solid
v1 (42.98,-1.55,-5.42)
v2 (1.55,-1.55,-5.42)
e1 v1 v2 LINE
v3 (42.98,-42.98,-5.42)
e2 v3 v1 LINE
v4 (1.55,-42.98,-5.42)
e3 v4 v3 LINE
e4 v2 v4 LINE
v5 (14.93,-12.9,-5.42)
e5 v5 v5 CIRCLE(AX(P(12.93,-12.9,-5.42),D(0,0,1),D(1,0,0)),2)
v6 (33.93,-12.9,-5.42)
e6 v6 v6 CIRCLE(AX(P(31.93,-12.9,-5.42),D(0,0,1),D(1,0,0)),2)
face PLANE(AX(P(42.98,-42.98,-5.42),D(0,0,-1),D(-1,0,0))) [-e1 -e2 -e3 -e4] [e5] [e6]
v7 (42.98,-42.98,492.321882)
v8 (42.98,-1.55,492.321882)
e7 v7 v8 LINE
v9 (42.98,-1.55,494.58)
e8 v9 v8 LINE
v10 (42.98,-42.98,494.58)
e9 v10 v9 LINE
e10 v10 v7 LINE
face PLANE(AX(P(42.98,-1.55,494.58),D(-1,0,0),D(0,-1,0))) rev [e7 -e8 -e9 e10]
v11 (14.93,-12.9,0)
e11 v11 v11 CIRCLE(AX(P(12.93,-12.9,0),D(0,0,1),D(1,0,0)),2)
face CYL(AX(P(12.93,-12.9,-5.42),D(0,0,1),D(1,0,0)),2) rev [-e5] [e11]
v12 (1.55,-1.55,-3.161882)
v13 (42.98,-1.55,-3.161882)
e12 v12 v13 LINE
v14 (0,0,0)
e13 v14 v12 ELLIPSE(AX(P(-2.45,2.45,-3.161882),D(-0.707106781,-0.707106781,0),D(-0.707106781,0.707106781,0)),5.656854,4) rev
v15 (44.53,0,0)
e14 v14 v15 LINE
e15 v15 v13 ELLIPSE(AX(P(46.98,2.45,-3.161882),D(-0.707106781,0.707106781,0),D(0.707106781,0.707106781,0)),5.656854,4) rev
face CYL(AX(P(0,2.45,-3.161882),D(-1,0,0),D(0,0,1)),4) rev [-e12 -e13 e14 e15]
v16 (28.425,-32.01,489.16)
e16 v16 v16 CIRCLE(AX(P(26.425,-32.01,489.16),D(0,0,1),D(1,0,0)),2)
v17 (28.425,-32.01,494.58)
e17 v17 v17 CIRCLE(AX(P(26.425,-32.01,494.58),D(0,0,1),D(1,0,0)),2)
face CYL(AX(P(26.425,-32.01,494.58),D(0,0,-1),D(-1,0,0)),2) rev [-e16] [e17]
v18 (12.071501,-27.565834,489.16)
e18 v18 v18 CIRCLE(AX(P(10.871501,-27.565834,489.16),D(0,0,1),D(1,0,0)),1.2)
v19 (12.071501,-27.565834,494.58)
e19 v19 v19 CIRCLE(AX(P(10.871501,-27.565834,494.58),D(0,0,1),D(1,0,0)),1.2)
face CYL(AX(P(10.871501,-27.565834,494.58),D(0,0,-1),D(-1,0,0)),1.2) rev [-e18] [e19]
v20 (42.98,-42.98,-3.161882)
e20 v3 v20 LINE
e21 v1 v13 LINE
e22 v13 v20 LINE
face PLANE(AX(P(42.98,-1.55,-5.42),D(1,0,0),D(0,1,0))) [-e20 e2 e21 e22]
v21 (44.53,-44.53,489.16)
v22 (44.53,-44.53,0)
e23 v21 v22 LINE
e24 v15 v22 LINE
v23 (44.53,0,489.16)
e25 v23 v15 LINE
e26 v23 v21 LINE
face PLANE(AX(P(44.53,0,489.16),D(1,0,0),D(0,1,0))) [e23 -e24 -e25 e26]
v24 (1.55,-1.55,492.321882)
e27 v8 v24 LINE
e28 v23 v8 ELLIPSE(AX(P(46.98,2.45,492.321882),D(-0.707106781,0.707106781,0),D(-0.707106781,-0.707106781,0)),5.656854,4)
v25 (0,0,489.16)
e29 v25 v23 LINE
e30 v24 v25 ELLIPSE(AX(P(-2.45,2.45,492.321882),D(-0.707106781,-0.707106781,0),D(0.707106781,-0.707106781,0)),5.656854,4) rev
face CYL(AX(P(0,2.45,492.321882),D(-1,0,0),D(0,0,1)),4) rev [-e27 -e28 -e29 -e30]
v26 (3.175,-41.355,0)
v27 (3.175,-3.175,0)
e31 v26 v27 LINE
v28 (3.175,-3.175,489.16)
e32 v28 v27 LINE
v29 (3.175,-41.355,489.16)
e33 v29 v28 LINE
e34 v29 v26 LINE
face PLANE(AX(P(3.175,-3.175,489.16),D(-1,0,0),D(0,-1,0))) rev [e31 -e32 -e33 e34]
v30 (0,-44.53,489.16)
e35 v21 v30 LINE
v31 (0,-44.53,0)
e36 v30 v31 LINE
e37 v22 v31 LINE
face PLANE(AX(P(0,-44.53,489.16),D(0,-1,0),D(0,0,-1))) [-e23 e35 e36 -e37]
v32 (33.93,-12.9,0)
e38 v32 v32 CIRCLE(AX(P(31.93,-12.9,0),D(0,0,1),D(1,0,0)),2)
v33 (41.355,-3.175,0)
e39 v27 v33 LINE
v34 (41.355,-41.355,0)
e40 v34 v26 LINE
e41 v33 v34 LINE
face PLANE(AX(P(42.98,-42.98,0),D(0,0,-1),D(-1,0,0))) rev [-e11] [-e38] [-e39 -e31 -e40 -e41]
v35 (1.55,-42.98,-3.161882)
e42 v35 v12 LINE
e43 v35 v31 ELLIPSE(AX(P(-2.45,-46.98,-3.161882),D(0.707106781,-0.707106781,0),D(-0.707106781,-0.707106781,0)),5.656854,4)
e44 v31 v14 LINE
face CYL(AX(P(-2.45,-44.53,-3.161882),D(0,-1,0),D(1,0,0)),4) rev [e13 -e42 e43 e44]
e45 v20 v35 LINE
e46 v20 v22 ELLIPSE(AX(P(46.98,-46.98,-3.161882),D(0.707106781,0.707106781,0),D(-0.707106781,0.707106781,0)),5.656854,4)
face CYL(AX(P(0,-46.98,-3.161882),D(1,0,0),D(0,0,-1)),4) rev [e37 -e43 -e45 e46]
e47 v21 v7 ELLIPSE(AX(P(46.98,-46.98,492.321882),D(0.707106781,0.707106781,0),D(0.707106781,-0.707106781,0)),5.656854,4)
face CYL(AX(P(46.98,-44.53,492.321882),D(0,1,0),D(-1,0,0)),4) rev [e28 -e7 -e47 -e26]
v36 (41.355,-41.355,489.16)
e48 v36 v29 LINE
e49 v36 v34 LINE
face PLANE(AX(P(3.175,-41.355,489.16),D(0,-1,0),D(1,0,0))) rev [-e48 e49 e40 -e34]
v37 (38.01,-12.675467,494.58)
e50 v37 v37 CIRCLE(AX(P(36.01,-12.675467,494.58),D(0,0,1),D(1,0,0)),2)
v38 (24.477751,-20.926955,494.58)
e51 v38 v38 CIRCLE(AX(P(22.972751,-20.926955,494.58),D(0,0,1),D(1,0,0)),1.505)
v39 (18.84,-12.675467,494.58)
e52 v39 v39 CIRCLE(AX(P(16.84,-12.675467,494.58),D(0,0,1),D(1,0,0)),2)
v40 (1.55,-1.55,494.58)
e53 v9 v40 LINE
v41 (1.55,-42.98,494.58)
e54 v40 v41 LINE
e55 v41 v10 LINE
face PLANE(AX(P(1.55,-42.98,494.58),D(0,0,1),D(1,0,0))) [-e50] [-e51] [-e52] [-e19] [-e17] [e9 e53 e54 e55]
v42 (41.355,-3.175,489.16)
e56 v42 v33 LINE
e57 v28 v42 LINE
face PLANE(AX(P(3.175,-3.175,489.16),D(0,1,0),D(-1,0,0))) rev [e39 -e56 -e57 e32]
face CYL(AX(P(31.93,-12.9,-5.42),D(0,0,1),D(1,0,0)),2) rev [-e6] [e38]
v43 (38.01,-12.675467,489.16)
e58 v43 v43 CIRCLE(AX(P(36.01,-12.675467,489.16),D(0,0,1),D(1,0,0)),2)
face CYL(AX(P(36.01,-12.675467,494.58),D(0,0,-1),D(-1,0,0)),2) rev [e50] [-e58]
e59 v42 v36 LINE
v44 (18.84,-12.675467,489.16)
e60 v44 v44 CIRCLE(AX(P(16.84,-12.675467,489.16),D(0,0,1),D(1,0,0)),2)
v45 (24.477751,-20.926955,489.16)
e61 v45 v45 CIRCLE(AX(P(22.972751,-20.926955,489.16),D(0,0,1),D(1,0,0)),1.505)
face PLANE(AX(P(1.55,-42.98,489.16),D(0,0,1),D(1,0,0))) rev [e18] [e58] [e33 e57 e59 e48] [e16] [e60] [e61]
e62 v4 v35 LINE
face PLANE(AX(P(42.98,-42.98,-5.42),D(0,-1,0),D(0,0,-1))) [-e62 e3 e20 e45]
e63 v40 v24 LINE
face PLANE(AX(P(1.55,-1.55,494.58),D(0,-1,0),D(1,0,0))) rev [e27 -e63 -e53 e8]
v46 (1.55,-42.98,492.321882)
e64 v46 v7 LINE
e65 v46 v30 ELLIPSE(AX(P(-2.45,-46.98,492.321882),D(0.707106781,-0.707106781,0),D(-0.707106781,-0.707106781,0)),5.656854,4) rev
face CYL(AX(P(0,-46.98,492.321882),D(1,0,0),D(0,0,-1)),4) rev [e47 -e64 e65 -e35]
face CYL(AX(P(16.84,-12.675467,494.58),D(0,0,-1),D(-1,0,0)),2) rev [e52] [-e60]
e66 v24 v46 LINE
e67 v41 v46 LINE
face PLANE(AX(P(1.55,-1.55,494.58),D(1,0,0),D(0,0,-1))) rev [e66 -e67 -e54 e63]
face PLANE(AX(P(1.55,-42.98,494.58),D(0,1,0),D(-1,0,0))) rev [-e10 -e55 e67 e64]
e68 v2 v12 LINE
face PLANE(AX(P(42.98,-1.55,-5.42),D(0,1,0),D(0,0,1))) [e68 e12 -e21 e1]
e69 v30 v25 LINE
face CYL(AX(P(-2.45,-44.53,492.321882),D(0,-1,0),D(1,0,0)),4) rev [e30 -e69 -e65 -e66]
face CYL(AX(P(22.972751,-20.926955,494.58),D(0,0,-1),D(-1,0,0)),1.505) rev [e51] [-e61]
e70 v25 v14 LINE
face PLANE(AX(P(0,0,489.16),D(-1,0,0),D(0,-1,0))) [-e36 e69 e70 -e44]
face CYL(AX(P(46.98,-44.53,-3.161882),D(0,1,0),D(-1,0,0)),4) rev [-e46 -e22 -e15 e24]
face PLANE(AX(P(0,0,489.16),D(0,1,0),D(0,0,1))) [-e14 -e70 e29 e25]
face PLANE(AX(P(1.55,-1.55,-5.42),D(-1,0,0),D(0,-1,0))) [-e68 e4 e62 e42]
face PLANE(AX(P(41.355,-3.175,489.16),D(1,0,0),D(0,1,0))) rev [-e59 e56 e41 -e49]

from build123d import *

# Parameters (mm, degrees)
SKETCH1_W           = 41.43
SKETCH1_H           = 41.43
SKETCH1_R           = 2
BOSS_EXTRUDE1_DEPTH = 5.42
SKETCH2_W           = 44.53
SKETCH2_H           = 44.53
SKETCH2_W_2         = 38.18
SKETCH2_H_2         = 38.18
BOSS_EXTRUDE2_DEPTH = 489.16
SKETCH3_W           = 41.43
SKETCH3_H           = 41.43
SKETCH3_R           = 2
SKETCH3_R_2         = 1.505
SKETCH3_R_3         = 1.2
BOSS_EXTRUDE3_DEPTH = 5.42
FILLET1_R           = 4


with BuildPart() as part:
    # Sketch1 → Boss-Extrude1 (new body)
    with BuildSketch(Plane.XY):
        with Locations((22.265, -22.265)):
            Rectangle(SKETCH1_W, SKETCH1_H)
        with Locations((12.93, -12.9)):
            Circle(SKETCH1_R, mode=Mode.SUBTRACT)
        with Locations((31.93, -12.9)):
            Circle(SKETCH1_R, mode=Mode.SUBTRACT)
    extrude(amount=-BOSS_EXTRUDE1_DEPTH)

    # Sketch2 → Boss-Extrude2 (add)
    with BuildSketch(Plane(origin=(0, 0, 0), x_dir=(-1, 0, 0), z_dir=(0, 0, -1))):
        with Locations((-22.265, -22.265)):
            Rectangle(SKETCH2_W, SKETCH2_H)
        with Locations((-22.265, -22.265)):
            Rectangle(SKETCH2_W_2, SKETCH2_H_2, mode=Mode.SUBTRACT)
    extrude(amount=-BOSS_EXTRUDE2_DEPTH)

    # Sketch3 → Boss-Extrude3 (add)
    with BuildSketch(Plane.XY.offset(489.16)):
        with Locations((22.265, -22.265)):
            Rectangle(SKETCH3_W, SKETCH3_H)
        with Locations((16.84, -12.675466776)):
            Circle(SKETCH3_R, mode=Mode.SUBTRACT)
        with Locations((36.01, -12.675466776)):
            Circle(SKETCH3_R, mode=Mode.SUBTRACT)
        with Locations((26.425, -32.01)):
            Circle(SKETCH3_R, mode=Mode.SUBTRACT)
        with Locations((22.97275137, -20.926955012)):
            Circle(SKETCH3_R_2, mode=Mode.SUBTRACT)
        with Locations((10.8715013, -27.565833881)):
            Circle(SKETCH3_R_3, mode=Mode.SUBTRACT)
    extrude(amount=BOSS_EXTRUDE3_DEPTH)

    # Fillet1
    # the kernel refuses this fillet: 4 mm, written as the material it adds along each edge
    with BuildSketch(Plane(origin=(1.55, -42.98, 0), x_dir=(0, -1, 0), z_dir=(1, 0, 0)), Plane(origin=(1.55, -42.98, 489.16), x_dir=(-1, 0, 0), z_dir=(0, 1, 0)), Plane(origin=(42.98, -42.98, 489.16), x_dir=(0, -1, 0), z_dir=(-1, 0, 0)), Plane(origin=(42.98, -1.55, 489.16), x_dir=(1, 0, 0), z_dir=(0, -1, 0)), Plane(origin=(1.55, -1.55, 489.16), x_dir=(0, 1, 0), z_dir=(1, 0, 0))) as fillet1_piece_1:
        with BuildLine():
            CenterArc((4, 3.161882351), FILLET1_R, 180, 52.229510411)
            Line((0, 3.161882351), (-0.08, 3.161882351))
            Line((-0.08, 3.161882351), (-0.08, 0))
            Line((-0.08, 0), (0, -0.08))
            ThreePointArc((0, -0.08), (0.775, -0.08), (1.501, -0.063237647))
            Line((1.501, -0.063237647), (1.55, 0))
        make_face()
    extrude(amount=41.43)
    with BuildSketch(Plane(origin=(1.55, -1.55, 0), x_dir=(0, 0, -1), z_dir=(0, -1, 0)), Plane(origin=(42.98, -1.55, 0), x_dir=(0, 0, -1), z_dir=(-1, 0, 0)), Plane(origin=(42.98, -42.98, 0), x_dir=(0, 0, -1), z_dir=(0, 1, 0))) as fillet1_piece_2:
        with BuildLine():
            CenterArc((3.161882351, -4), FILLET1_R, 90, 52.229510411)
            Line((0, -1.55), (-0.063237647, -1.501))
            ThreePointArc((-0.063237647, -1.501), (-0.08, -0.775), (-0.08, 0))
            Line((-0.08, 0), (0, 0.08))
            Line((0, 0.08), (3.161882351, 0.08))
            Line((3.161882351, 0.08), (3.161882351, 0))
        make_face()
    extrude(amount=41.43)
    with BuildSketch(Plane(origin=(1.55, -1.55, 0), x_dir=(0, 0, -1), z_dir=(0, -1, 0))) as fillet1_piece_3a_section:
        with BuildLine():
            CenterArc((3.161882351, -4), FILLET1_R, 90, 52.229510411)
            Line((0, -1.55), (-0.063237647, -1.501))
            ThreePointArc((-0.063237647, -1.501), (-0.08, -0.775), (-0.08, 0))
            Line((-0.08, 0), (0, 0.08))
            Line((0, 0.08), (3.161882351, 0.08))
            Line((3.161882351, 0.08), (3.161882351, 0))
        make_face()
    fillet1_piece_3a = extrude(amount=49.334705877, mode=Mode.PRIVATE)
    fillet1_piece_3a = split(fillet1_piece_3a, bisect_by=Plane(origin=(1.154343324, -42.98, -0.817162135), z_dir=(0, -1, 0)), keep=Keep.TOP, mode=Mode.PRIVATE)
    fillet1_piece_3a = split(fillet1_piece_3a, bisect_by=Plane(origin=(1.154343324, -44.53, -0.817162135), z_dir=(0, 1, 0)), keep=Keep.TOP, mode=Mode.PRIVATE)
    with BuildSketch(Plane(origin=(-6.354705877, -42.98, 0), x_dir=(0, -1, 0), z_dir=(1, 0, 0))) as fillet1_piece_3b_section:
        with BuildLine():
            CenterArc((4, 3.161882351), FILLET1_R, 180, 52.229510411)
            Line((0, 3.161882351), (-0.08, 3.161882351))
            Line((-0.08, 3.161882351), (-0.08, 0))
            Line((-0.08, 0), (0, -0.08))
            ThreePointArc((0, -0.08), (0.775, -0.08), (1.501, -0.063237647))
            Line((1.501, -0.063237647), (1.55, 0))
        make_face()
    fillet1_piece_3b = extrude(amount=49.334705877, mode=Mode.PRIVATE)
    fillet1_piece_3b = split(fillet1_piece_3b, bisect_by=Plane(origin=(1.55, -43.375656676, -0.817162135), z_dir=(-1, 0, 0)), keep=Keep.TOP, mode=Mode.PRIVATE)
    fillet1_piece_3b = split(fillet1_piece_3b, bisect_by=Plane(origin=(0, -43.375656676, -0.817162135), z_dir=(1, 0, 0)), keep=Keep.TOP, mode=Mode.PRIVATE)
    fillet1_piece_3 = fillet1_piece_3a & fillet1_piece_3b
    add(fillet1_piece_3)
    with BuildSketch(Plane(origin=(42.98, -50.884705877, 0), x_dir=(0, 0, -1), z_dir=(0, 1, 0))) as fillet1_piece_4a_section:
        with BuildLine():
            CenterArc((3.161882351, -4), FILLET1_R, 90, 52.229510411)
            Line((0, -1.55), (-0.063237647, -1.501))
            ThreePointArc((-0.063237647, -1.501), (-0.08, -0.775), (-0.08, 0))
            Line((-0.08, 0), (0, 0.08))
            Line((0, 0.08), (3.161882351, 0.08))
            Line((3.161882351, 0.08), (3.161882351, 0))
        make_face()
    fillet1_piece_4a = extrude(amount=49.334705877, mode=Mode.PRIVATE)
    fillet1_piece_4a = split(fillet1_piece_4a, bisect_by=Plane(origin=(43.375656676, -42.98, -0.817162135), z_dir=(0, -1, 0)), keep=Keep.TOP, mode=Mode.PRIVATE)
    fillet1_piece_4a = split(fillet1_piece_4a, bisect_by=Plane(origin=(43.375656676, -44.53, -0.817162135), z_dir=(0, 1, 0)), keep=Keep.TOP, mode=Mode.PRIVATE)
    with BuildSketch(Plane(origin=(1.55, -42.98, 0), x_dir=(0, -1, 0), z_dir=(1, 0, 0))) as fillet1_piece_4b_section:
        with BuildLine():
            CenterArc((4, 3.161882351), FILLET1_R, 180, 52.229510411)
            Line((0, 3.161882351), (-0.08, 3.161882351))
            Line((-0.08, 3.161882351), (-0.08, 0))
            Line((-0.08, 0), (0, -0.08))
            ThreePointArc((0, -0.08), (0.775, -0.08), (1.501, -0.063237647))
            Line((1.501, -0.063237647), (1.55, 0))
        make_face()
    fillet1_piece_4b = extrude(amount=49.334705877, mode=Mode.PRIVATE)
    fillet1_piece_4b = split(fillet1_piece_4b, bisect_by=Plane(origin=(42.98, -43.375656676, -0.817162135), z_dir=(1, 0, 0)), keep=Keep.TOP, mode=Mode.PRIVATE)
    fillet1_piece_4b = split(fillet1_piece_4b, bisect_by=Plane(origin=(44.53, -43.375656676, -0.817162135), z_dir=(-1, 0, 0)), keep=Keep.TOP, mode=Mode.PRIVATE)
    fillet1_piece_4 = fillet1_piece_4a & fillet1_piece_4b
    add(fillet1_piece_4)
    with BuildSketch(Plane(origin=(42.98, -1.55, 0), x_dir=(0, 0, -1), z_dir=(-1, 0, 0))) as fillet1_piece_5a_section:
        with BuildLine():
            CenterArc((3.161882351, -4), FILLET1_R, 90, 52.229510411)
            Line((0, -1.55), (-0.063237647, -1.501))
            ThreePointArc((-0.063237647, -1.501), (-0.08, -0.775), (-0.08, 0))
            Line((-0.08, 0), (0, 0.08))
            Line((0, 0.08), (3.161882351, 0.08))
            Line((3.161882351, 0.08), (3.161882351, 0))
        make_face()
    fillet1_piece_5a = extrude(amount=49.334705877, mode=Mode.PRIVATE)
    fillet1_piece_5a = split(fillet1_piece_5a, bisect_by=Plane(origin=(1.55, -1.154343324, -0.817162135), z_dir=(-1, 0, 0)), keep=Keep.TOP, mode=Mode.PRIVATE)
    fillet1_piece_5a = split(fillet1_piece_5a, bisect_by=Plane(origin=(0, -1.154343324, -0.817162135), z_dir=(1, 0, 0)), keep=Keep.TOP, mode=Mode.PRIVATE)
    with BuildSketch(Plane(origin=(1.55, 6.354705877, 0), x_dir=(0, 0, -1), z_dir=(0, -1, 0))) as fillet1_piece_5b_section:
        with BuildLine():
            CenterArc((3.161882351, -4), FILLET1_R, 90, 52.229510411)
            Line((0, -1.55), (-0.063237647, -1.501))
            ThreePointArc((-0.063237647, -1.501), (-0.08, -0.775), (-0.08, 0))
            Line((-0.08, 0), (0, 0.08))
            Line((0, 0.08), (3.161882351, 0.08))
            Line((3.161882351, 0.08), (3.161882351, 0))
        make_face()
    fillet1_piece_5b = extrude(amount=49.334705877, mode=Mode.PRIVATE)
    fillet1_piece_5b = split(fillet1_piece_5b, bisect_by=Plane(origin=(1.154343324, -1.55, -0.817162135), z_dir=(0, 1, 0)), keep=Keep.TOP, mode=Mode.PRIVATE)
    fillet1_piece_5b = split(fillet1_piece_5b, bisect_by=Plane(origin=(1.154343324, 0, -0.817162135), z_dir=(0, -1, 0)), keep=Keep.TOP, mode=Mode.PRIVATE)
    fillet1_piece_5 = fillet1_piece_5a & fillet1_piece_5b
    add(fillet1_piece_5)
    with BuildSketch(Plane(origin=(42.98, -42.98, 489.16), x_dir=(0, -1, 0), z_dir=(-1, 0, 0))) as fillet1_piece_6a_section:
        with BuildLine():
            CenterArc((4, 3.161882351), FILLET1_R, 180, 52.229510411)
            Line((0, 3.161882351), (-0.08, 3.161882351))
            Line((-0.08, 3.161882351), (-0.08, 0))
            Line((-0.08, 0), (0, -0.08))
            ThreePointArc((0, -0.08), (0.775, -0.08), (1.501, -0.063237647))
            Line((1.501, -0.063237647), (1.55, 0))
        make_face()
    fillet1_piece_6a = extrude(amount=49.334705877, mode=Mode.PRIVATE)
    fillet1_piece_6a = split(fillet1_piece_6a, bisect_by=Plane(origin=(0, -43.375656676, 489.977162135), z_dir=(1, 0, 0)), keep=Keep.TOP, mode=Mode.PRIVATE)
    fillet1_piece_6a = split(fillet1_piece_6a, bisect_by=Plane(origin=(1.55, -43.375656676, 489.977162135), z_dir=(-1, 0, 0)), keep=Keep.TOP, mode=Mode.PRIVATE)
    with BuildSketch(Plane(origin=(1.55, -50.884705877, 489.16), x_dir=(-1, 0, 0), z_dir=(0, 1, 0))) as fillet1_piece_6b_section:
        with BuildLine():
            CenterArc((4, 3.161882351), FILLET1_R, 180, 52.229510411)
            Line((0, 3.161882351), (-0.08, 3.161882351))
            Line((-0.08, 3.161882351), (-0.08, 0))
            Line((-0.08, 0), (0, -0.08))
            ThreePointArc((0, -0.08), (0.775, -0.08), (1.501, -0.063237647))
            Line((1.501, -0.063237647), (1.55, 0))
        make_face()
    fillet1_piece_6b = extrude(amount=49.334705877, mode=Mode.PRIVATE)
    fillet1_piece_6b = split(fillet1_piece_6b, bisect_by=Plane(origin=(1.154343324, -44.53, 489.977162135), z_dir=(0, 1, 0)), keep=Keep.TOP, mode=Mode.PRIVATE)
    fillet1_piece_6b = split(fillet1_piece_6b, bisect_by=Plane(origin=(1.154343324, -42.98, 489.977162135), z_dir=(0, -1, 0)), keep=Keep.TOP, mode=Mode.PRIVATE)
    fillet1_piece_6 = fillet1_piece_6a & fillet1_piece_6b
    add(fillet1_piece_6)
    with BuildSketch(Plane(origin=(-6.354705877, -1.55, 489.16), x_dir=(0, 1, 0), z_dir=(1, 0, 0))) as fillet1_piece_7a_section:
        with BuildLine():
            CenterArc((4, 3.161882351), FILLET1_R, 180, 52.229510411)
            Line((0, 3.161882351), (-0.08, 3.161882351))
            Line((-0.08, 3.161882351), (-0.08, 0))
            Line((-0.08, 0), (0, -0.08))
            ThreePointArc((0, -0.08), (0.775, -0.08), (1.501, -0.063237647))
            Line((1.501, -0.063237647), (1.55, 0))
        make_face()
    fillet1_piece_7a = extrude(amount=49.334705877, mode=Mode.PRIVATE)
    fillet1_piece_7a = split(fillet1_piece_7a, bisect_by=Plane(origin=(0, -1.154343324, 489.977162135), z_dir=(1, 0, 0)), keep=Keep.TOP, mode=Mode.PRIVATE)
    fillet1_piece_7a = split(fillet1_piece_7a, bisect_by=Plane(origin=(1.55, -1.154343324, 489.977162135), z_dir=(-1, 0, 0)), keep=Keep.TOP, mode=Mode.PRIVATE)
    with BuildSketch(Plane(origin=(1.55, -42.98, 489.16), x_dir=(-1, 0, 0), z_dir=(0, 1, 0))) as fillet1_piece_7b_section:
        with BuildLine():
            CenterArc((4, 3.161882351), FILLET1_R, 180, 52.229510411)
            Line((0, 3.161882351), (-0.08, 3.161882351))
            Line((-0.08, 3.161882351), (-0.08, 0))
            Line((-0.08, 0), (0, -0.08))
            ThreePointArc((0, -0.08), (0.775, -0.08), (1.501, -0.063237647))
            Line((1.501, -0.063237647), (1.55, 0))
        make_face()
    fillet1_piece_7b = extrude(amount=49.334705877, mode=Mode.PRIVATE)
    fillet1_piece_7b = split(fillet1_piece_7b, bisect_by=Plane(origin=(1.154343324, 0, 489.977162135), z_dir=(0, -1, 0)), keep=Keep.TOP, mode=Mode.PRIVATE)
    fillet1_piece_7b = split(fillet1_piece_7b, bisect_by=Plane(origin=(1.154343324, -1.55, 489.977162135), z_dir=(0, 1, 0)), keep=Keep.TOP, mode=Mode.PRIVATE)
    fillet1_piece_7 = fillet1_piece_7a & fillet1_piece_7b
    add(fillet1_piece_7)
    with BuildSketch(Plane(origin=(42.98, -1.55, 489.16), x_dir=(1, 0, 0), z_dir=(0, -1, 0))) as fillet1_piece_8a_section:
        with BuildLine():
            CenterArc((4, 3.161882351), FILLET1_R, 180, 52.229510411)
            Line((0, 3.161882351), (-0.08, 3.161882351))
            Line((-0.08, 3.161882351), (-0.08, 0))
            Line((-0.08, 0), (0, -0.08))
            ThreePointArc((0, -0.08), (0.775, -0.08), (1.501, -0.063237647))
            Line((1.501, -0.063237647), (1.55, 0))
        make_face()
    fillet1_piece_8a = extrude(amount=49.334705877, mode=Mode.PRIVATE)
    fillet1_piece_8a = split(fillet1_piece_8a, bisect_by=Plane(origin=(43.375656676, -44.53, 489.977162135), z_dir=(0, 1, 0)), keep=Keep.TOP, mode=Mode.PRIVATE)
    fillet1_piece_8a = split(fillet1_piece_8a, bisect_by=Plane(origin=(43.375656676, -42.98, 489.977162135), z_dir=(0, -1, 0)), keep=Keep.TOP, mode=Mode.PRIVATE)
    with BuildSketch(Plane(origin=(50.884705877, -42.98, 489.16), x_dir=(0, -1, 0), z_dir=(-1, 0, 0))) as fillet1_piece_8b_section:
        with BuildLine():
            CenterArc((4, 3.161882351), FILLET1_R, 180, 52.229510411)
            Line((0, 3.161882351), (-0.08, 3.161882351))
            Line((-0.08, 3.161882351), (-0.08, 0))
            Line((-0.08, 0), (0, -0.08))
            ThreePointArc((0, -0.08), (0.775, -0.08), (1.501, -0.063237647))
            Line((1.501, -0.063237647), (1.55, 0))
        make_face()
    fillet1_piece_8b = extrude(amount=49.334705877, mode=Mode.PRIVATE)
    fillet1_piece_8b = split(fillet1_piece_8b, bisect_by=Plane(origin=(44.53, -43.375656676, 489.977162135), z_dir=(-1, 0, 0)), keep=Keep.TOP, mode=Mode.PRIVATE)
    fillet1_piece_8b = split(fillet1_piece_8b, bisect_by=Plane(origin=(42.98, -43.375656676, 489.977162135), z_dir=(1, 0, 0)), keep=Keep.TOP, mode=Mode.PRIVATE)
    fillet1_piece_8 = fillet1_piece_8a & fillet1_piece_8b
    add(fillet1_piece_8)
    with BuildSketch(Plane(origin=(1.55, -1.55, 489.16), x_dir=(0, 1, 0), z_dir=(1, 0, 0))) as fillet1_piece_9a_section:
        with BuildLine():
            CenterArc((4, 3.161882351), FILLET1_R, 180, 52.229510411)
            Line((0, 3.161882351), (-0.08, 3.161882351))
            Line((-0.08, 3.161882351), (-0.08, 0))
            Line((-0.08, 0), (0, -0.08))
            ThreePointArc((0, -0.08), (0.775, -0.08), (1.501, -0.063237647))
            Line((1.501, -0.063237647), (1.55, 0))
        make_face()
    fillet1_piece_9a = extrude(amount=49.334705877, mode=Mode.PRIVATE)
    fillet1_piece_9a = split(fillet1_piece_9a, bisect_by=Plane(origin=(44.53, -1.154343324, 489.977162135), z_dir=(-1, 0, 0)), keep=Keep.TOP, mode=Mode.PRIVATE)
    fillet1_piece_9a = split(fillet1_piece_9a, bisect_by=Plane(origin=(42.98, -1.154343324, 489.977162135), z_dir=(1, 0, 0)), keep=Keep.TOP, mode=Mode.PRIVATE)
    with BuildSketch(Plane(origin=(42.98, 6.354705877, 489.16), x_dir=(1, 0, 0), z_dir=(0, -1, 0))) as fillet1_piece_9b_section:
        with BuildLine():
            CenterArc((4, 3.161882351), FILLET1_R, 180, 52.229510411)
            Line((0, 3.161882351), (-0.08, 3.161882351))
            Line((-0.08, 3.161882351), (-0.08, 0))
            Line((-0.08, 0), (0, -0.08))
            ThreePointArc((0, -0.08), (0.775, -0.08), (1.501, -0.063237647))
            Line((1.501, -0.063237647), (1.55, 0))
        make_face()
    fillet1_piece_9b = extrude(amount=49.334705877, mode=Mode.PRIVATE)
    fillet1_piece_9b = split(fillet1_piece_9b, bisect_by=Plane(origin=(43.375656676, 0, 489.977162135), z_dir=(0, -1, 0)), keep=Keep.TOP, mode=Mode.PRIVATE)
    fillet1_piece_9b = split(fillet1_piece_9b, bisect_by=Plane(origin=(43.375656676, -1.55, 489.977162135), z_dir=(0, 1, 0)), keep=Keep.TOP, mode=Mode.PRIVATE)
    fillet1_piece_9 = fillet1_piece_9a & fillet1_piece_9b
    add(fillet1_piece_9)
    with BuildSketch(Plane(origin=(50.884705877, -1.55, 0), x_dir=(0, 0, -1), z_dir=(-1, 0, 0))) as fillet1_piece_10a_section:
        with BuildLine():
            CenterArc((3.161882351, -4), FILLET1_R, 90, 52.229510411)
            Line((0, -1.55), (-0.063237647, -1.501))
            ThreePointArc((-0.063237647, -1.501), (-0.08, -0.775), (-0.08, 0))
            Line((-0.08, 0), (0, 0.08))
            Line((0, 0.08), (3.161882351, 0.08))
            Line((3.161882351, 0.08), (3.161882351, 0))
        make_face()
    fillet1_piece_10a = extrude(amount=49.334705877, mode=Mode.PRIVATE)
    fillet1_piece_10a = split(fillet1_piece_10a, bisect_by=Plane(origin=(42.98, -1.154343324, -0.817162135), z_dir=(1, 0, 0)), keep=Keep.TOP, mode=Mode.PRIVATE)
    fillet1_piece_10a = split(fillet1_piece_10a, bisect_by=Plane(origin=(44.53, -1.154343324, -0.817162135), z_dir=(-1, 0, 0)), keep=Keep.TOP, mode=Mode.PRIVATE)
    with BuildSketch(Plane(origin=(42.98, -42.98, 0), x_dir=(0, 0, -1), z_dir=(0, 1, 0))) as fillet1_piece_10b_section:
        with BuildLine():
            CenterArc((3.161882351, -4), FILLET1_R, 90, 52.229510411)
            Line((0, -1.55), (-0.063237647, -1.501))
            ThreePointArc((-0.063237647, -1.501), (-0.08, -0.775), (-0.08, 0))
            Line((-0.08, 0), (0, 0.08))
            Line((0, 0.08), (3.161882351, 0.08))
            Line((3.161882351, 0.08), (3.161882351, 0))
        make_face()
    fillet1_piece_10b = extrude(amount=49.334705877, mode=Mode.PRIVATE)
    fillet1_piece_10b = split(fillet1_piece_10b, bisect_by=Plane(origin=(43.375656676, -1.55, -0.817162135), z_dir=(0, 1, 0)), keep=Keep.TOP, mode=Mode.PRIVATE)
    fillet1_piece_10b = split(fillet1_piece_10b, bisect_by=Plane(origin=(43.375656676, 0, -0.817162135), z_dir=(0, -1, 0)), keep=Keep.TOP, mode=Mode.PRIVATE)
    fillet1_piece_10 = fillet1_piece_10a & fillet1_piece_10b
    add(fillet1_piece_10)


solid = part.part
